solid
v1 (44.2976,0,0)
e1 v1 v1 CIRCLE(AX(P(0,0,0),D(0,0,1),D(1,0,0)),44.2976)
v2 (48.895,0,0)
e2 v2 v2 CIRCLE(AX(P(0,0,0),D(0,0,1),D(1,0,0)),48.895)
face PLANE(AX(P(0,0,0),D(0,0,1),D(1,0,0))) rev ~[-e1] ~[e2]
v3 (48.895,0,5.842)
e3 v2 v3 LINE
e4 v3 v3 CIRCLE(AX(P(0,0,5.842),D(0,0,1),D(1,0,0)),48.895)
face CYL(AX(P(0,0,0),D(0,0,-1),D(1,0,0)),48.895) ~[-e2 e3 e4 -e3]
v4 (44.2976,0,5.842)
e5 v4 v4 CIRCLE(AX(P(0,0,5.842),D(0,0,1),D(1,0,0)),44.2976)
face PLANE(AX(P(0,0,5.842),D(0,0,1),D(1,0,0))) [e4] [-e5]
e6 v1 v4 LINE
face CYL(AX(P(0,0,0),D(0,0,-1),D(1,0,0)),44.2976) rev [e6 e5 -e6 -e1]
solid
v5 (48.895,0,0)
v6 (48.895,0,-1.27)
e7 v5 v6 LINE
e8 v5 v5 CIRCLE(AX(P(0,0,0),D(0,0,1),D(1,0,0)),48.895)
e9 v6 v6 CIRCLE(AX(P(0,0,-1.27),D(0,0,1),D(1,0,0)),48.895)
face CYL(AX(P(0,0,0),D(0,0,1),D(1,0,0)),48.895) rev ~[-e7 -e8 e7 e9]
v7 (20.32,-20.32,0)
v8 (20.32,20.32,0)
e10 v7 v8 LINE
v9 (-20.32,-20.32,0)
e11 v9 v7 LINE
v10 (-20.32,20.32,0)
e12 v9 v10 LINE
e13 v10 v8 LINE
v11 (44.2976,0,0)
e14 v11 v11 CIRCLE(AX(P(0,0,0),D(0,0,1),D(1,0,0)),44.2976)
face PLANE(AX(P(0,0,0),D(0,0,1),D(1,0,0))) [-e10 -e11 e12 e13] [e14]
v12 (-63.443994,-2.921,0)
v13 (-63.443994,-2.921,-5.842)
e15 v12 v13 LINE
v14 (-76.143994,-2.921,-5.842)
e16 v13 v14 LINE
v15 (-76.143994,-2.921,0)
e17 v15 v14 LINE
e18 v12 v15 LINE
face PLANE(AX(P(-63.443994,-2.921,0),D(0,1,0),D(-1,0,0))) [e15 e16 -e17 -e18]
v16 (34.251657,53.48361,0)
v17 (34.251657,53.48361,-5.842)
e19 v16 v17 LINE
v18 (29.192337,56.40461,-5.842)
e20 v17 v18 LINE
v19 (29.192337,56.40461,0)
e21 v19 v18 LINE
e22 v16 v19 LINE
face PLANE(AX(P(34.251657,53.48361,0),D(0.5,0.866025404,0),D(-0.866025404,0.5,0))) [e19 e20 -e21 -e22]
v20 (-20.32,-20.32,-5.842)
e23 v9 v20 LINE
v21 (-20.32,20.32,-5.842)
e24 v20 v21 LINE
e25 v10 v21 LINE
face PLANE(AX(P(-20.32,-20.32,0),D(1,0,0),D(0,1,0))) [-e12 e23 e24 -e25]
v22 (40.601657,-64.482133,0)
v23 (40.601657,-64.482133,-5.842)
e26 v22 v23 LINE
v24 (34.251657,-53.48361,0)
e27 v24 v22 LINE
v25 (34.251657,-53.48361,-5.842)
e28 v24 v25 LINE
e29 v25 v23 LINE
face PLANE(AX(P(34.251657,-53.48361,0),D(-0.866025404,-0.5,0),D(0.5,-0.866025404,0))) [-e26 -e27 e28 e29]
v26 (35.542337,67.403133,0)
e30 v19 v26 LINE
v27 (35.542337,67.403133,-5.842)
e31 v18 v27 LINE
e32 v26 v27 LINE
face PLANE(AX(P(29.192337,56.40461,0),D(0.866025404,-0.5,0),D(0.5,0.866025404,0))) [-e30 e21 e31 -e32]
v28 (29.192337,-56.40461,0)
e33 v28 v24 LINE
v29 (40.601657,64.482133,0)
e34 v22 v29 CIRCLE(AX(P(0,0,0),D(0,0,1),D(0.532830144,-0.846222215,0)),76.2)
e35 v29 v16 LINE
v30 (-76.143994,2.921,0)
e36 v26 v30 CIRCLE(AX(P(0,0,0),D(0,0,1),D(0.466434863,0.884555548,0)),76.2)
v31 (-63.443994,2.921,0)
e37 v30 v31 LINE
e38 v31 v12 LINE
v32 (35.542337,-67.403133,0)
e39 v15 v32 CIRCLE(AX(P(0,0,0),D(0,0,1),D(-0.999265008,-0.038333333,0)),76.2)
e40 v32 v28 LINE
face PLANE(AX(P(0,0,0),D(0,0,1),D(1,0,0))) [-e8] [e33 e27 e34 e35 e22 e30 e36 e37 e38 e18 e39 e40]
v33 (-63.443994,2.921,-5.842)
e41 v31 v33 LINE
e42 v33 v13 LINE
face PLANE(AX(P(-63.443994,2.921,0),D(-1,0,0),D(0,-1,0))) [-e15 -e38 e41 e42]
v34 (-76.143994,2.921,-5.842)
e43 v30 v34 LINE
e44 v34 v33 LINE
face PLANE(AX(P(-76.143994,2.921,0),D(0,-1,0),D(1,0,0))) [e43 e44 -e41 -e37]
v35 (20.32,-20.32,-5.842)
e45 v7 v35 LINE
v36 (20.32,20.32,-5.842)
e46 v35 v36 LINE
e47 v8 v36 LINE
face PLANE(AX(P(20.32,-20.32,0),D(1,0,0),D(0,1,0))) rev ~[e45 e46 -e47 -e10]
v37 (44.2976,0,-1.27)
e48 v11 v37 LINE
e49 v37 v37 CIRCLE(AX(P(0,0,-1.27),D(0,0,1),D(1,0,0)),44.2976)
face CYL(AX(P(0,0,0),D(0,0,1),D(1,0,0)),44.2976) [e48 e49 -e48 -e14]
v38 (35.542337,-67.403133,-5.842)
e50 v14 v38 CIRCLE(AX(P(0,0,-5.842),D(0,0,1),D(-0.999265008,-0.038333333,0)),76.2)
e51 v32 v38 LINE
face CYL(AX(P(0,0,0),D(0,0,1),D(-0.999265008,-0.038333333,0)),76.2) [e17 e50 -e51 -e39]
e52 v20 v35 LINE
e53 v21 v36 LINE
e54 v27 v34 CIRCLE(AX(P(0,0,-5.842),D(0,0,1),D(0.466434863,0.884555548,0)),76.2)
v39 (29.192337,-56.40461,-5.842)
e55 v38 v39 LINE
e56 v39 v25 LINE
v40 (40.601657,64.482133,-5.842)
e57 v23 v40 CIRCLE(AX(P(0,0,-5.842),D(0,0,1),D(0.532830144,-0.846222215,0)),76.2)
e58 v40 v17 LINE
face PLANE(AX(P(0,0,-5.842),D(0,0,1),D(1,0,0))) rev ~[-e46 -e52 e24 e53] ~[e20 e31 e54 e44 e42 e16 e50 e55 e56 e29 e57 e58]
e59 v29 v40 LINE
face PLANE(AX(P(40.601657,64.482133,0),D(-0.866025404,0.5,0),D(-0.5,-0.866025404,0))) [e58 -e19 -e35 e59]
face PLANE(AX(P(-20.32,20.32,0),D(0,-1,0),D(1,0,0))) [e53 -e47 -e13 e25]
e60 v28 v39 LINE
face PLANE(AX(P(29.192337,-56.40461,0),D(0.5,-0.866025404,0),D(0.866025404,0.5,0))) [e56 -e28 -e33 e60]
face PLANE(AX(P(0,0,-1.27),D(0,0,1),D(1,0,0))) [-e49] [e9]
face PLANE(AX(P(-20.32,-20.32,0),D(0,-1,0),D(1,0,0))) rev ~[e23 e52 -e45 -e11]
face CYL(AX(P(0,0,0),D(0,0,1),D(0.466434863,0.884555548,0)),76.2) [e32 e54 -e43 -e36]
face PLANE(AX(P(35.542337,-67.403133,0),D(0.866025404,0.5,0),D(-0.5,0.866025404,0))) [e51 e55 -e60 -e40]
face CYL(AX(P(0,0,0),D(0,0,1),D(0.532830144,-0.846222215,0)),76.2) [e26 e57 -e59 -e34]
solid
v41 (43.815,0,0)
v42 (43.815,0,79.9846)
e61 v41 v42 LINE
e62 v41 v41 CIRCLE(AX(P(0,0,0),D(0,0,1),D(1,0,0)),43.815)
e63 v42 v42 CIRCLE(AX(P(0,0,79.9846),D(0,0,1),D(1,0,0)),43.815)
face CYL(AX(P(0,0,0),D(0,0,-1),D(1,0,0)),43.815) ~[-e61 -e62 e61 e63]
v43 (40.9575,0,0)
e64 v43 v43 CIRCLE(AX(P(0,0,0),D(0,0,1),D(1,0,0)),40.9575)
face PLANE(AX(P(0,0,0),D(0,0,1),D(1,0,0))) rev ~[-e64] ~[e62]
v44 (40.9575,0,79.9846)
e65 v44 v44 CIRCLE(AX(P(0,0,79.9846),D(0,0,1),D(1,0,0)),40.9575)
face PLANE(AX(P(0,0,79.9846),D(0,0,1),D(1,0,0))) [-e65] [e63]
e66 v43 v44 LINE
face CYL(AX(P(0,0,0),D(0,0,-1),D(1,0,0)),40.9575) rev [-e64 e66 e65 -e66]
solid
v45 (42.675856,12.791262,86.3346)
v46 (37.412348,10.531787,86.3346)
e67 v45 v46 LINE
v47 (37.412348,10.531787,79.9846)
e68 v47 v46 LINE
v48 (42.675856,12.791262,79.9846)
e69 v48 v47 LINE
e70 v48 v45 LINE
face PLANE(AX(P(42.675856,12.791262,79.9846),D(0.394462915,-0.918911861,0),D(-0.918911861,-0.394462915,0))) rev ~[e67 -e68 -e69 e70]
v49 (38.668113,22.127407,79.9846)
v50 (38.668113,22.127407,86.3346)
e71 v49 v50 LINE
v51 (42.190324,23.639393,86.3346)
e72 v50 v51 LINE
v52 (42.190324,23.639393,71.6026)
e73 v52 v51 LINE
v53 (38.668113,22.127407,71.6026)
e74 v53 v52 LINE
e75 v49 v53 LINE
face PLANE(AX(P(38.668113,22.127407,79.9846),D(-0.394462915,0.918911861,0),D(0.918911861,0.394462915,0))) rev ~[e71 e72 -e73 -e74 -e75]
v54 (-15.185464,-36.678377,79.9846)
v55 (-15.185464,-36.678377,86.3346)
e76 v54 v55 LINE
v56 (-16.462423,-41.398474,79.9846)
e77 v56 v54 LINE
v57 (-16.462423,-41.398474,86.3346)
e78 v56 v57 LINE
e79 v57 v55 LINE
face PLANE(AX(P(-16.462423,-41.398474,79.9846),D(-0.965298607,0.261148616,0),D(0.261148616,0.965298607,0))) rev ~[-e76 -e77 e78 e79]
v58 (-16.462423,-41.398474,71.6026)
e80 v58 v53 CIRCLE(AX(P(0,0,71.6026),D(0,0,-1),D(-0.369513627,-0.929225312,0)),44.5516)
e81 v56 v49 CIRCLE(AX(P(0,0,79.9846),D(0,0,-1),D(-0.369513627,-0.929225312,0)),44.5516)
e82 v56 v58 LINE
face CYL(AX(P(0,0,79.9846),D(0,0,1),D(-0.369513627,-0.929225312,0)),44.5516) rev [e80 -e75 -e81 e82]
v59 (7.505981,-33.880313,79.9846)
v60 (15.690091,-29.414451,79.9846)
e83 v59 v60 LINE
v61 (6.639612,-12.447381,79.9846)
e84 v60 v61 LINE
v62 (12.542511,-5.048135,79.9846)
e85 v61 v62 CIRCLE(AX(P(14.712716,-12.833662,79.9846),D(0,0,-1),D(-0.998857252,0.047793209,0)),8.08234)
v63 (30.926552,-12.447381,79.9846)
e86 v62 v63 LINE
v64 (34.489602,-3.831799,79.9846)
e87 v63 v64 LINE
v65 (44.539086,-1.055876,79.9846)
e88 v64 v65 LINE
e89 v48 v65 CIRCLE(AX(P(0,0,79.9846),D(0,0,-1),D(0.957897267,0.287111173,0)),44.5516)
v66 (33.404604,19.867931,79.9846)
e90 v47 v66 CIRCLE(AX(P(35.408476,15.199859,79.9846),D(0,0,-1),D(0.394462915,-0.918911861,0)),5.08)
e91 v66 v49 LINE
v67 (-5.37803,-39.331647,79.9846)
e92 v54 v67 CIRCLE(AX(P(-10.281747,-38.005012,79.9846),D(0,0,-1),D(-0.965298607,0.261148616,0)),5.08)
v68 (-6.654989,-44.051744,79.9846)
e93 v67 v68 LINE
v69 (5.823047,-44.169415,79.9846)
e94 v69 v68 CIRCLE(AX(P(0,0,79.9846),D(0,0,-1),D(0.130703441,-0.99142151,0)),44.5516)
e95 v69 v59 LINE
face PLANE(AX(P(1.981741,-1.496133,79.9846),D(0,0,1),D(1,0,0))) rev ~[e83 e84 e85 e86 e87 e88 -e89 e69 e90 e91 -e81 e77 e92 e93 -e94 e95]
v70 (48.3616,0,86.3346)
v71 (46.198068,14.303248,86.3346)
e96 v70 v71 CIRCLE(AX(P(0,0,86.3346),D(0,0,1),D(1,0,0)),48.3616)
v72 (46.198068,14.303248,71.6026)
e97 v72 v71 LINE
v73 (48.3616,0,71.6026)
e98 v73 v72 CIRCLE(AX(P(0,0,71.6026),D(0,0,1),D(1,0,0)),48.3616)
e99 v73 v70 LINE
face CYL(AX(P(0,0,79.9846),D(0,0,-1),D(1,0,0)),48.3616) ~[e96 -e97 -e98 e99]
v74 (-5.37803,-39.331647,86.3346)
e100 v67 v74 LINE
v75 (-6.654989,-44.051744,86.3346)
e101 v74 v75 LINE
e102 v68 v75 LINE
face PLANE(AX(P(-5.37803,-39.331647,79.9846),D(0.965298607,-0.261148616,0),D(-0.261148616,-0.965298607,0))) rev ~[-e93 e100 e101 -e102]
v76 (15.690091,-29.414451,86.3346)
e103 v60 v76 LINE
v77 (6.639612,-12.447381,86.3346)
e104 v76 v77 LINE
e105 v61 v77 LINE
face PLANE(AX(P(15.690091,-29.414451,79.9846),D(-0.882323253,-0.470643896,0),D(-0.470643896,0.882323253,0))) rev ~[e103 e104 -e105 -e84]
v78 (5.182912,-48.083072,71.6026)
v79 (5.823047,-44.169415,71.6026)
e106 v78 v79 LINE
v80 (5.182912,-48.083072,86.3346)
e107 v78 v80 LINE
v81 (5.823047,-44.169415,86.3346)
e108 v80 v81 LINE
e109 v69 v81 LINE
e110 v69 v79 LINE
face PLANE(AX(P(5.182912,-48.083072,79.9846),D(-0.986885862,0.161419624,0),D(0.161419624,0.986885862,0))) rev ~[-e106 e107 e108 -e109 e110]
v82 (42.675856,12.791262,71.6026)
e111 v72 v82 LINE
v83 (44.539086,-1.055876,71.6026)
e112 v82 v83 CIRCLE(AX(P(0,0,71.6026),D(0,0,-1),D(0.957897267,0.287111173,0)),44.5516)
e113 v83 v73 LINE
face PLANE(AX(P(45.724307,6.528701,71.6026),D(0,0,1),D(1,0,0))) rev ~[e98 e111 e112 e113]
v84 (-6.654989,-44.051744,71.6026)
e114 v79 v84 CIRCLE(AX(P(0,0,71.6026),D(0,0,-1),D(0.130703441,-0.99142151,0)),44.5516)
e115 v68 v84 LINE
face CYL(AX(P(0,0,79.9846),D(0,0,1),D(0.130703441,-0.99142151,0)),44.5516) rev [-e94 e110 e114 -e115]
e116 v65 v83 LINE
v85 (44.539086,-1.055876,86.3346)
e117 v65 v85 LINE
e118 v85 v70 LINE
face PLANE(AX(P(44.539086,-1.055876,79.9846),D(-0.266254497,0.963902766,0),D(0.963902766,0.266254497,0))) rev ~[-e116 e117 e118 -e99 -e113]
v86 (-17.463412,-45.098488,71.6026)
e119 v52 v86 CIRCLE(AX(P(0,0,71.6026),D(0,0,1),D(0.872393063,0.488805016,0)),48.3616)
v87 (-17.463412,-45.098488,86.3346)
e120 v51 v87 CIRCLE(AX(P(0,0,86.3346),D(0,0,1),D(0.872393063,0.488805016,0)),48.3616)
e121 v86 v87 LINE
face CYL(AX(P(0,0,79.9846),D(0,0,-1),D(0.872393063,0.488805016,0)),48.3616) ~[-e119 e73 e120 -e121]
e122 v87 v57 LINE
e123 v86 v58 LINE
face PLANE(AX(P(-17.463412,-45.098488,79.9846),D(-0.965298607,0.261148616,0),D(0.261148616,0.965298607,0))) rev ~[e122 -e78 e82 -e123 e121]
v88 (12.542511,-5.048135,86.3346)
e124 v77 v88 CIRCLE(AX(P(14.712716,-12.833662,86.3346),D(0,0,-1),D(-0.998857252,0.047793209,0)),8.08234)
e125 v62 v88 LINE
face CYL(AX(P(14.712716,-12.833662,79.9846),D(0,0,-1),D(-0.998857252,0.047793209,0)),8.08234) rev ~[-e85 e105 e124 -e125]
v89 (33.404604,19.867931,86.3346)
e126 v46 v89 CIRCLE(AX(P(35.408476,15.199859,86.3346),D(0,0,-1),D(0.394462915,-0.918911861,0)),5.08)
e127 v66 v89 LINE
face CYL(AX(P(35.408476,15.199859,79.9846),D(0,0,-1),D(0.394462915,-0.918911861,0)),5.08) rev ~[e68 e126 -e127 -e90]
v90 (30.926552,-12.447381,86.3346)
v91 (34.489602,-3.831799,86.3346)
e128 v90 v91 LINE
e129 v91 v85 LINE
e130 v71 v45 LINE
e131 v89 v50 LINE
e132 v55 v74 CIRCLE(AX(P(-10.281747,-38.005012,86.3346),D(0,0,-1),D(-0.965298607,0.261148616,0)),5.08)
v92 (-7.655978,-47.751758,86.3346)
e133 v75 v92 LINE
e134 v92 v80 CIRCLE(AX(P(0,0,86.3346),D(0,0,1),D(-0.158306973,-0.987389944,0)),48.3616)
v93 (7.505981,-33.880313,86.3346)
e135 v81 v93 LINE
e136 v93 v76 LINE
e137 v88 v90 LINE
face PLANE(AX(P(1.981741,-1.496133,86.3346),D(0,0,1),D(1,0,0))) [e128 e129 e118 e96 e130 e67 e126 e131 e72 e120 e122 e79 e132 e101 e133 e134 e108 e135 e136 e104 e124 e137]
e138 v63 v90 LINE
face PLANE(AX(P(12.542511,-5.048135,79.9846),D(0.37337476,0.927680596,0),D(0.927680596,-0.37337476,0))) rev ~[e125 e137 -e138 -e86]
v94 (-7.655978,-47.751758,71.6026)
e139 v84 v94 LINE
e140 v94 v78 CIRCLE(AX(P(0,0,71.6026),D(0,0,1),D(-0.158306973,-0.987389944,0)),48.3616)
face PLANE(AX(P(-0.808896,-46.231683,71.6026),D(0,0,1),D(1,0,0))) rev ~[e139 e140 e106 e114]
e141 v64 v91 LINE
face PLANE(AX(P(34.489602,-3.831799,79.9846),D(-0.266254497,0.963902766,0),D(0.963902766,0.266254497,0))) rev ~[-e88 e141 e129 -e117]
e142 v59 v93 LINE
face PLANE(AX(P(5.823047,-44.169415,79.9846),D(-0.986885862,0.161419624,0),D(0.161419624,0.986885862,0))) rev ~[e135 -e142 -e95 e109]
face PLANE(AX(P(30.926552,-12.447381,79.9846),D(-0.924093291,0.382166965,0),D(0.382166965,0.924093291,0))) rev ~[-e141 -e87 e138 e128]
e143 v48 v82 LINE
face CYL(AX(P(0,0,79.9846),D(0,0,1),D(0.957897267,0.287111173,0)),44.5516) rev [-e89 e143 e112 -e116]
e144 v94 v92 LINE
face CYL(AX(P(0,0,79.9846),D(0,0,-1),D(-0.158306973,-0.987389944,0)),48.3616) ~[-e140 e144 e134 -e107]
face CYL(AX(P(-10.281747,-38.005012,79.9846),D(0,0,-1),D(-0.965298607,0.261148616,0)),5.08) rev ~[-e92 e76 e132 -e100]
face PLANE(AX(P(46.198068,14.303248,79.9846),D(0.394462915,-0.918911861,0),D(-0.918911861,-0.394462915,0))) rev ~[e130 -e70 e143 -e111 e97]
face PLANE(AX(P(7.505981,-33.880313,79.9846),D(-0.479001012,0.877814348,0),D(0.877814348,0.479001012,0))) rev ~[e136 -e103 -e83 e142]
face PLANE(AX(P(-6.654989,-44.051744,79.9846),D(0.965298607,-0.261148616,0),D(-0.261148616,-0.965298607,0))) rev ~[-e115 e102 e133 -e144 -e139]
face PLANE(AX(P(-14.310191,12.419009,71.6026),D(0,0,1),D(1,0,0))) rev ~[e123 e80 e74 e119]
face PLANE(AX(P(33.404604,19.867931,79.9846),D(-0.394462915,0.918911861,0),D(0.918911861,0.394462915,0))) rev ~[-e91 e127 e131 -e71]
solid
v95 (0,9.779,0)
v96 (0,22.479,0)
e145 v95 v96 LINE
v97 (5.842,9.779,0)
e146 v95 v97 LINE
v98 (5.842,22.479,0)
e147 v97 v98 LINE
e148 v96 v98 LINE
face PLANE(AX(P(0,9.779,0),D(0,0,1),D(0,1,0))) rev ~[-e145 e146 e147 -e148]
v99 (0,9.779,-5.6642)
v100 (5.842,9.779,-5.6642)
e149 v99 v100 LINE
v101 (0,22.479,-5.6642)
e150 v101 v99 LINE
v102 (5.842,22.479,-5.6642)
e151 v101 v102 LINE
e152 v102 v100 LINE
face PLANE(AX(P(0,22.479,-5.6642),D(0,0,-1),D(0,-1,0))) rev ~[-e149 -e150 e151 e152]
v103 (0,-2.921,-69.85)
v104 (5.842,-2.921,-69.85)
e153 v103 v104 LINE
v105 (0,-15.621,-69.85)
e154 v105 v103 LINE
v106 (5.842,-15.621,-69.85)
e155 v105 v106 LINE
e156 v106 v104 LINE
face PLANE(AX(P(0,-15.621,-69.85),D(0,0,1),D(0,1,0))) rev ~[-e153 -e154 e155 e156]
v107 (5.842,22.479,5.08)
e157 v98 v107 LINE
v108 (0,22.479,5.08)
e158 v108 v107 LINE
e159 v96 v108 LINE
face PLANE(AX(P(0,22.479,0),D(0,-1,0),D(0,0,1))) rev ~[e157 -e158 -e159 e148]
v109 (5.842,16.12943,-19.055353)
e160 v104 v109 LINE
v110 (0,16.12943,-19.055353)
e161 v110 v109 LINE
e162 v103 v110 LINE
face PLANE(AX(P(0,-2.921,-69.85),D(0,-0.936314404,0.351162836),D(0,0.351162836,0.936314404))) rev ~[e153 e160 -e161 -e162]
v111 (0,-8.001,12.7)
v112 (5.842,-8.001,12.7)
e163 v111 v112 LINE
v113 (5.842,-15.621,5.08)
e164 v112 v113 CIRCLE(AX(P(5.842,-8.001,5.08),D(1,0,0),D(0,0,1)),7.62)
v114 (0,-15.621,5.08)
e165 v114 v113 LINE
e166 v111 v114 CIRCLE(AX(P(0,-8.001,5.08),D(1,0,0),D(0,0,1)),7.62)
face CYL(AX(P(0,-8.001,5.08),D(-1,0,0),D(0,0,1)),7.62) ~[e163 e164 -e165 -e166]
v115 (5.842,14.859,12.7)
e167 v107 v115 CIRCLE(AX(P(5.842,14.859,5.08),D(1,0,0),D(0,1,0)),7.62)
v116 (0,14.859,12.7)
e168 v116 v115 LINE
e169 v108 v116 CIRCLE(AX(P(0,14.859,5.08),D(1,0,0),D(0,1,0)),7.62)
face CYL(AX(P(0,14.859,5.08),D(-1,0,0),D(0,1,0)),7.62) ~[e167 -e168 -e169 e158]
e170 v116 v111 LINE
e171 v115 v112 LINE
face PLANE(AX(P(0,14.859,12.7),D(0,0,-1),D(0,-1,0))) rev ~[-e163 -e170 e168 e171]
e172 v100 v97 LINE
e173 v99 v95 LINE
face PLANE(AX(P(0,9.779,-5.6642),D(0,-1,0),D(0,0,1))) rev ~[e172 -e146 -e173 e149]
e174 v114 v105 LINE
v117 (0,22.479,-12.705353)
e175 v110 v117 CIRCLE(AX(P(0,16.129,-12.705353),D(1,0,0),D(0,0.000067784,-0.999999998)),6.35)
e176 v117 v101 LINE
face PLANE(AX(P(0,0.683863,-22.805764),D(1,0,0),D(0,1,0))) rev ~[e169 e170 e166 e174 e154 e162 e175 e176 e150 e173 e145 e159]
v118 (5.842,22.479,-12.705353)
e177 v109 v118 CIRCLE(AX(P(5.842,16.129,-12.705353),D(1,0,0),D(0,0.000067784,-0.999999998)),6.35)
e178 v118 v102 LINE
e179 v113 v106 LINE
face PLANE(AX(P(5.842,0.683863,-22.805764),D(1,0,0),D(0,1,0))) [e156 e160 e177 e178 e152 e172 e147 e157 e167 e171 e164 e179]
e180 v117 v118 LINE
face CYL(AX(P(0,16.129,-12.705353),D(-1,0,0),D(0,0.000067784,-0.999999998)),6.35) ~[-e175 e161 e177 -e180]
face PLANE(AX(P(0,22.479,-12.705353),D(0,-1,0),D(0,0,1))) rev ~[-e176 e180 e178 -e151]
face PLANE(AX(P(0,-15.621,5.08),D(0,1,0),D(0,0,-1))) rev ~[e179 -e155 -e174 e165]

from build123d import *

# Parameters (mm, degrees)
F0_R      = 43.815
F0_R_2    = 40.9575
F1_DEPTH  = 79.9846
F2_W      = 40.64
F2_H      = 40.64
F3_DEPTH  = 5.842
F4_DEPTH  = 5.843
F6_DEPTH  = 5.842
F8_DEPTH  = 8.382
F9_DEPTH  = 6.35
F0_R_3    = 48.895
F0_R_4    = 44.2976
F10_DEPTH = 5.842
F11_DEPTH = 1.27


# Not quite as in the source:
# - a feature names something its author has since deleted; it is built from what else it names


with BuildPart() as f1:
    # F0 (on Top) → F1 (new body)
    with BuildSketch(Plane.XY):
        Circle(F0_R)
        Circle(F0_R_2, mode=Mode.SUBTRACT)
    extrude(amount=F1_DEPTH)

    # F2 (on Top) → F4 (cut, through all)
    with BuildSketch(Plane.XY):
        Rectangle(F2_W, F2_H)
    extrude(amount=-F4_DEPTH, mode=Mode.SUBTRACT)


with BuildPart() as f3:
    # F2 (on Top) → F3 (new body)
    with BuildSketch(Plane.XY):
        with BuildLine():
            Line((-63.4439935845, -2.921), (-76.1439935845, -2.921))
            ThreePointArc((-76.1439935845, -2.921), (-38.1, -65.9911357684), (35.5423365878, -67.4031327898))
            Line((35.5423365878, -67.4031327898), (29.1923365878, -56.4046101617))
            Line((29.1923365878, -56.4046101617), (34.2516569967, -53.4836101617))
            Line((34.2516569967, -53.4836101617), (40.6016569967, -64.4821327898))
            ThreePointArc((40.6016569967, -64.4821327898), (76.2, 0), (40.6016569967, 64.4821327898))
            Line((40.6016569967, 64.4821327898), (34.2516569967, 53.4836101617))
            Line((34.2516569967, 53.4836101617), (29.1923365878, 56.4046101617))
            Line((29.1923365878, 56.4046101617), (35.5423365878, 67.4031327898))
            ThreePointArc((35.5423365878, 67.4031327898), (-38.1, 65.9911357684), (-76.1439935845, 2.921))
            Line((-76.1439935845, 2.921), (-63.4439935845, 2.921))
            Line((-63.4439935845, 2.921), (-63.4439935845, -2.921))
        make_face()
        Rectangle(F2_W, F2_H, mode=Mode.SUBTRACT)
    extrude(amount=-F3_DEPTH)

    # F0 (on Top) → F11 (cut)
    with BuildSketch(Plane.XY):
        Circle(F0_R_3)
        Circle(F0_R_4, mode=Mode.SUBTRACT)
    extrude(amount=-F11_DEPTH, mode=Mode.SUBTRACT)


with BuildPart() as f6:
    # F5 (on Right) → F6 (new body)
    with BuildSketch(Plane.YZ):
        with BuildLine():
            Line((-15.621, -69.85), (-2.921, -69.85))
            Line((-2.921, -69.85), (16.1294304292, -19.0553526104))
            ThreePointArc((16.1294304292, -19.0553526104), (20.6192802377, -17.1953285033), (22.479, -12.705352625))
            Line((22.479, -12.705352625), (22.479, -5.6642))
            Line((22.479, -5.6642), (9.779, -5.6642))
            Line((9.779, -5.6642), (9.779, 0))
            Line((9.779, 0), (22.479, 0))
            Line((22.479, 0), (22.479, 5.08))
            ThreePointArc((22.479, 5.08), (20.2471536726, 10.4681536726), (14.859, 12.7))
            Line((14.859, 12.7), (-8.001, 12.7))
            ThreePointArc((-8.001, 12.7), (-13.3891536726, 10.4681536726), (-15.621, 5.08))
            Line((-15.621, 5.08), (-15.621, -69.85))
        make_face()
    extrude(amount=F6_DEPTH)


with BuildPart() as f8:
    # F7 (on face) → F8 (new body)
    with BuildSketch(Plane.XY.offset(79.9846)):
        with BuildLine():
            ThreePointArc((42.675855879, 12.7912621565), (44.1536785796, 5.9411893128), (44.5390860822, -1.0558757115))
            Line((44.5390860822, -1.0558757115), (48.3616, 0))
            ThreePointArc((48.3616, 0), (47.8176579237, 7.2329762373), (46.198067559, 14.3032481757))
            Line((46.198067559, 14.3032481757), (42.675855879, 12.7912621565))
        make_face()
    extrude(amount=-F8_DEPTH)



with BuildPart() as f8b:
    # F7 (on face) → F8, piece 2 (new body)
    with BuildSketch(Plane.XY.offset(79.9846)):
        with BuildLine():
            Line((5.1829115282, -48.0830716849), (5.8230474227, -44.1694145453))
            ThreePointArc((5.8230474227, -44.1694145453), (-0.4201112399, -44.5496191803), (-6.6549894488, -44.0517443241))
            Line((-6.6549894488, -44.0517443241), (-7.6559784913, -47.7517575373))
            ThreePointArc((-7.6559784913, -47.7517575373), (-1.2475805854, -48.3455054503), (5.1829115282, -48.0830716849))
        make_face()
    extrude(amount=-F8_DEPTH)


with BuildPart() as f8c:
    # F7 (on face) → F8, piece 3 (new body)
    with BuildSketch(Plane.XY.offset(79.9846)):
        with BuildLine():
            ThreePointArc((-16.4624232954, -41.3984743898), (-33.6475489603, 29.2008135422), (38.6681126614, 22.127406666))
            Line((38.6681126614, 22.127406666), (42.1903243414, 23.6393926852))
            ThreePointArc((42.1903243414, 23.6393926852), (-36.525047446, 31.6980324882), (-17.4634123379, -45.098487603))
            Line((-17.4634123379, -45.098487603), (-16.4624232954, -41.3984743898))
        make_face()
    extrude(amount=-F8_DEPTH)


with BuildPart() as f8_1:
    add(f8.part)

    add(f8b.part)  # F9 merges F8b

    add(f8c.part)  # F9 merges F8c
    # F7 (on face) → F9 (join)
    with BuildSketch(Plane.XY.offset(79.9846)):
        with BuildLine():
            Line((34.489602072, -3.8317991766), (44.5390860822, -1.0558757115))
            ThreePointArc((44.5390860822, -1.0558757115), (44.1536785796, 5.9411893128), (42.675855879, 12.7912621565))
            Line((42.675855879, 12.7912621565), (37.4123476678, 10.5317867047))
            ThreePointArc((37.4123476678, 10.5317867047), (30.7404038042, 13.1959873507), (33.4046044502, 19.8679312142))
            Line((33.4046044502, 19.8679312142), (38.6681126614, 22.127406666))
            ThreePointArc((38.6681126614, 22.127406666), (-33.6475489603, 29.2008135422), (-16.4624232954, -41.3984743898))
            Line((-16.4624232954, -41.3984743898), (-15.1854641746, -36.6783771467))
            ThreePointArc((-15.1854641746, -36.6783771467), (-8.9551122842, -33.1012951905), (-5.378030328, -39.331647081))
            Line((-5.378030328, -39.331647081), (-6.6549894488, -44.0517443241))
            ThreePointArc((-6.6549894488, -44.0517443241), (-0.4201112399, -44.5496191803), (5.8230474227, -44.1694145453))
            Line((5.8230474227, -44.1694145453), (7.5059805853, -33.8803127415))
            Line((7.5059805853, -33.8803127415), (15.690090875, -29.4144514582))
            Line((15.690090875, -29.4144514582), (6.6396118432, -12.4473810776))
            ThreePointArc((6.6396118432, -12.4473810776), (8.394602452, -7.7932588029), (12.5425105212, -5.0481349743))
            Line((12.5425105212, -5.0481349743), (30.9265518698, -12.4473810776))
            Line((30.9265518698, -12.4473810776), (34.489602072, -3.8317991766))
        make_face()
        with BuildLine():
            ThreePointArc((42.675855879, 12.7912621565), (44.1536785796, 5.9411893128), (44.5390860822, -1.0558757115))
            Line((44.5390860822, -1.0558757115), (48.3616, 0))
            ThreePointArc((48.3616, 0), (47.8176579237, 7.2329762373), (46.198067559, 14.3032481757))
            Line((46.198067559, 14.3032481757), (42.675855879, 12.7912621565))
        make_face()
        with BuildLine():
            ThreePointArc((-16.4624232954, -41.3984743898), (-33.6475489603, 29.2008135422), (38.6681126614, 22.127406666))
            Line((38.6681126614, 22.127406666), (42.1903243414, 23.6393926852))
            ThreePointArc((42.1903243414, 23.6393926852), (-36.525047446, 31.6980324882), (-17.4634123379, -45.098487603))
            Line((-17.4634123379, -45.098487603), (-16.4624232954, -41.3984743898))
        make_face()
        with BuildLine():
            Line((5.1829115282, -48.0830716849), (5.8230474227, -44.1694145453))
            ThreePointArc((5.8230474227, -44.1694145453), (-0.4201112399, -44.5496191803), (-6.6549894488, -44.0517443241))
            Line((-6.6549894488, -44.0517443241), (-7.6559784913, -47.7517575373))
            ThreePointArc((-7.6559784913, -47.7517575373), (-1.2475805854, -48.3455054503), (5.1829115282, -48.0830716849))
        make_face()
    extrude(amount=F9_DEPTH)


with BuildPart() as f10:
    # F0 (on Top) → F10 (new body)
    with BuildSketch(Plane.XY):
        Circle(F0_R_3)
        Circle(F0_R_4, mode=Mode.SUBTRACT)
    extrude(amount=F10_DEPTH)


solid = Compound([f1.part, f3.part, f6.part, f8_1.part, f10.part])
